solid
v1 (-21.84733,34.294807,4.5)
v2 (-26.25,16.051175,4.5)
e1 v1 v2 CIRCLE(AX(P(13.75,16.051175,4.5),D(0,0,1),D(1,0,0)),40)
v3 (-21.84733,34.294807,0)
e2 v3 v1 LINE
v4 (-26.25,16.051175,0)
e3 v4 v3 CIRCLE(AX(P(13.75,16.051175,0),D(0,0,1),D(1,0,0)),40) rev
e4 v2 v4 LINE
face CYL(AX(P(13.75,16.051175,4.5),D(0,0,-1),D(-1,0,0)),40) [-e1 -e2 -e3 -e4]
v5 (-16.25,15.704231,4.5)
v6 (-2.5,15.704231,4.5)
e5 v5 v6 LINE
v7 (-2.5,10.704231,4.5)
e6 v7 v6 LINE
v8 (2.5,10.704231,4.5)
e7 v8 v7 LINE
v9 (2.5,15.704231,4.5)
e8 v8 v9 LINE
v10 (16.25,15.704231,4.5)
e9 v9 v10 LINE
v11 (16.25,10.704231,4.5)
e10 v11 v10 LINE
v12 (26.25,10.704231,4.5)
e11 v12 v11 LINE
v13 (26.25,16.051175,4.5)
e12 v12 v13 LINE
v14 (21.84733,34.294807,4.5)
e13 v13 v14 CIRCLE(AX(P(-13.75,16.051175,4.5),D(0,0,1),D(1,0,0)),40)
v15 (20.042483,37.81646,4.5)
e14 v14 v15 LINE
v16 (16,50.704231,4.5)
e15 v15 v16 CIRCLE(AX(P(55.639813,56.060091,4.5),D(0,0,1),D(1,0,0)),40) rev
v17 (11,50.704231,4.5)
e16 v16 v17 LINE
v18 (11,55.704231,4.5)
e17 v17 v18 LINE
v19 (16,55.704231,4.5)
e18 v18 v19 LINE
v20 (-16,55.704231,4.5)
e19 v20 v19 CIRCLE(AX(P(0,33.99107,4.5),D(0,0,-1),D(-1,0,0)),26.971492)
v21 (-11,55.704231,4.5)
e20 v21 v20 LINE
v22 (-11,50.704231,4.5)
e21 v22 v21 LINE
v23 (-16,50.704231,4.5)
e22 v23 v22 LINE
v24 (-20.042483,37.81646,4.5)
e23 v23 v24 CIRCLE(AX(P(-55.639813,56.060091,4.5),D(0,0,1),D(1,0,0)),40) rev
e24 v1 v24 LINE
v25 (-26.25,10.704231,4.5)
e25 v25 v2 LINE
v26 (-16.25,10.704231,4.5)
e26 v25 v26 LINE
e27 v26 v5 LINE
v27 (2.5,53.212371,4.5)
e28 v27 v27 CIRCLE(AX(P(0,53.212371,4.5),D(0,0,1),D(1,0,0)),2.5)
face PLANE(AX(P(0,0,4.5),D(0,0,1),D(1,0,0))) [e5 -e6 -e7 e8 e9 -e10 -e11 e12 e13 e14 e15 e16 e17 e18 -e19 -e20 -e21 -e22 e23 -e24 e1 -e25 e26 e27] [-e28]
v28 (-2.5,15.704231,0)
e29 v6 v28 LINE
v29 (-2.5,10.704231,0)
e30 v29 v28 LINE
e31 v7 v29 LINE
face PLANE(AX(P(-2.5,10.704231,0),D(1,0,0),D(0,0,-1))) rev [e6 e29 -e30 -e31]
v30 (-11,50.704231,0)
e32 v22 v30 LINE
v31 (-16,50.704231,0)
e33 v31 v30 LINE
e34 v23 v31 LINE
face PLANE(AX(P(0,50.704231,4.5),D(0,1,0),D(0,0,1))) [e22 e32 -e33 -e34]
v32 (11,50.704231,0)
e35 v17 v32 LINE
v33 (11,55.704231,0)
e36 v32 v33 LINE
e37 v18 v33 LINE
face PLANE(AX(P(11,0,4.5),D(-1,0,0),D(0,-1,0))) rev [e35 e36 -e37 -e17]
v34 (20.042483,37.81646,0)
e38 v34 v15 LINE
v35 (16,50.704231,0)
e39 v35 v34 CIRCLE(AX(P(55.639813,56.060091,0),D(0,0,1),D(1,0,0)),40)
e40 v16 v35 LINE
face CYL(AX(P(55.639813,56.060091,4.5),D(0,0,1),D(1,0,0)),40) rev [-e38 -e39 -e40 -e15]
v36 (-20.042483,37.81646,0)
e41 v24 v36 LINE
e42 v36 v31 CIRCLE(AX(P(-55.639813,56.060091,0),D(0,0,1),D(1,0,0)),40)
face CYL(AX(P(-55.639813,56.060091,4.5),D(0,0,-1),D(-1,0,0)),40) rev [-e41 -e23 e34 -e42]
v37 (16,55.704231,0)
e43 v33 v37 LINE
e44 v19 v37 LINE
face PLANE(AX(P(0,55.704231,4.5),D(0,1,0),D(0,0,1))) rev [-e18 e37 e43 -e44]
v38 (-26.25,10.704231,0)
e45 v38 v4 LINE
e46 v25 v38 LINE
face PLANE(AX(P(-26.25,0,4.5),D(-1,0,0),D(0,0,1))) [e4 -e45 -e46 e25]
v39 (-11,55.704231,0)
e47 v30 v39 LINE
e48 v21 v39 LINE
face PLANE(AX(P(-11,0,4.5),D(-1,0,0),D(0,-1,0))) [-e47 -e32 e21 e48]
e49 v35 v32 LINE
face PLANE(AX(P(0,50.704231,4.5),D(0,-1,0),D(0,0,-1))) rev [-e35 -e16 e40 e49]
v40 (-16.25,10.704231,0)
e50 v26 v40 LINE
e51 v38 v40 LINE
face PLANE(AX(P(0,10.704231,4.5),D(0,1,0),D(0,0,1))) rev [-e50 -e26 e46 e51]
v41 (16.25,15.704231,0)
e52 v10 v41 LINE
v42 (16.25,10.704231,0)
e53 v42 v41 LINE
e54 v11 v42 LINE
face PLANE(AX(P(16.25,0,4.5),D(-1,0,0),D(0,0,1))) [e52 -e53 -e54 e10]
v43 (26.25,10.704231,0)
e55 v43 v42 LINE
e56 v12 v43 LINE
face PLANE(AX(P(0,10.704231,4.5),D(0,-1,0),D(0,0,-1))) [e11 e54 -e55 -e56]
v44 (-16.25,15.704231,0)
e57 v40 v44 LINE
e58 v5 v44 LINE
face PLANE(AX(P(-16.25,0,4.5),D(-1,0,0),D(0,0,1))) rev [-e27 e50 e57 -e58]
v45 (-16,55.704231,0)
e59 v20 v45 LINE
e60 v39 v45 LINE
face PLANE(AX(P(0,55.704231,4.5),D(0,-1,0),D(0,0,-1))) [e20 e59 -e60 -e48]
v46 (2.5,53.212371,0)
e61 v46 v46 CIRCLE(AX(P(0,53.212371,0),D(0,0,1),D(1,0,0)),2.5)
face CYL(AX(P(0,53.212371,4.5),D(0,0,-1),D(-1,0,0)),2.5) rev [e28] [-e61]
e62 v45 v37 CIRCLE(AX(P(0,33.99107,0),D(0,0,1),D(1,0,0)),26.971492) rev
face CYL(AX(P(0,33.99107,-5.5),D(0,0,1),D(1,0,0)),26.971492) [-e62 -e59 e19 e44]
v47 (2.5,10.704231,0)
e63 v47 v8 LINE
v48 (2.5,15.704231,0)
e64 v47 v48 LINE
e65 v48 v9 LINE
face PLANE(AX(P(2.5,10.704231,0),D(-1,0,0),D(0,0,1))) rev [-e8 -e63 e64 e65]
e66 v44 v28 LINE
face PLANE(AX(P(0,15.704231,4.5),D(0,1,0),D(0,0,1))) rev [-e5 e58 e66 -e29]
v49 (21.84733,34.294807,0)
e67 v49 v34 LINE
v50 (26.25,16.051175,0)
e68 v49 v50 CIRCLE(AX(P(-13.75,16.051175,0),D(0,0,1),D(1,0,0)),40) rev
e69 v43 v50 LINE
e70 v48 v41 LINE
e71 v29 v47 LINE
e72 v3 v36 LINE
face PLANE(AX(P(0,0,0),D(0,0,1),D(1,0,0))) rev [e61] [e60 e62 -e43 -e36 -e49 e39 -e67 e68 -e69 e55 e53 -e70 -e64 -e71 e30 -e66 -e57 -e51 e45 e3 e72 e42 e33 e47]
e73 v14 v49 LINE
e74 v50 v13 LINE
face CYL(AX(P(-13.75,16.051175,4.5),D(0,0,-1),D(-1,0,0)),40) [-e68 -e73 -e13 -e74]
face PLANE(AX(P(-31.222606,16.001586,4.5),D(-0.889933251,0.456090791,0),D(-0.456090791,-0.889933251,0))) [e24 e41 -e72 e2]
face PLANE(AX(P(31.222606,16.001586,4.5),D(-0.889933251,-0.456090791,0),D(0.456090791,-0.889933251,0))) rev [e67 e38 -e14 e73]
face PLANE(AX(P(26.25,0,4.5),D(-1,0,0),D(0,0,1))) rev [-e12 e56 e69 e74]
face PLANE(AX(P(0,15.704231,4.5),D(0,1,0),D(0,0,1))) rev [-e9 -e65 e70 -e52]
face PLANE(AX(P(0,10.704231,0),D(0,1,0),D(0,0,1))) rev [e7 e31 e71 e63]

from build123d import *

# Parameters (mm, degrees)
SKETCH1_R           = 2.5
BOSS_EXTRUDE1_DEPTH = 4.5
FILLET1_R           = 40
SKETCH2_W           = 5
SKETCH2_H           = 4.5
BOSS_EXTRUDE2_DEPTH = 5
CHAMFER1_SIZE       = 6
FILLET2_R           = 30
CUT_EXTRUDE1_DEPTH  = 10


# Some blends are built 0.0001 mm under size
with BuildPart() as part:
    # Sketch1 → Boss-Extrude1 (new body)
    with BuildSketch(Plane.XY):
        Polygon((-16.25, 10.704231142), (-16.25, 15.704231142), (16.25, 15.704231142), (16.25, 10.704231142), (26.25, 10.704231142), (26.25, 25.704231142), (16, 45.704231142), (16, 50.704231142), (11, 50.704231142), (11, 55.704231142), (16, 55.704231142), (16, 61.704231142), (-16, 61.704231142), (-16, 55.704231142), (-11, 55.704231142), (-11, 50.704231142), (-16, 50.704231142), (-16, 45.704231142), (-26.25, 25.704231142), (-26.25, 10.704231142), align=None)
        with Locations((0, 53.212370659)):
            Circle(SKETCH1_R, mode=Mode.SUBTRACT)
    extrude(amount=BOSS_EXTRUDE1_DEPTH)

    # Fillet1
    # the kernel refuses this fillet: 40 mm, written as the material it adds along each edge
    with BuildSketch(Plane(origin=(-16, 45.704231142, 0), x_dir=(0, 1, 0), z_dir=(0, 0, 1))) as fillet1_piece_1:
        with BuildLine():
            CenterArc((10.355860331, 39.639812816), FILLET1_R, 242.864860378, 19.440324463)
            Line((-7.887771306, 4.042482794), (0, 0))
            Line((0, 0), (5, 0))
        make_face()
    extrude(amount=4.5)
    with BuildSketch(Plane(origin=(16, 45.704231142, 0), x_dir=(0.4560907909103989, -0.8899332505568757, 0), z_dir=(0, 0, 1))) as fillet1_piece_2:
        with BuildLine():
            CenterArc((8.863329132, 40), FILLET1_R, 250.559675537, 19.440324463)
            Line((-4.449666253, 2.280453955), (0, 0))
            Line((0, 0), (8.863329132, 0))
        make_face()
    extrude(amount=4.5)
    # the kernel refuses this fillet: 40 mm, written as the material it takes off along each edge
    with BuildSketch(Plane(origin=(-26.25, 25.704231142, -24.132640175), x_dir=(0, -1, 0), z_dir=(0, 0, 1))) as fillet1_2_piece_1:
        with BuildLine():
            CenterArc((FILLET1_R * 0.241326401753, FILLET1_R), FILLET1_R, 242.864860378, 27.135139622)
            Line((-FILLET1_R * 0.214764389157, FILLET1_R * 0.110066749443), (0, 0))
            Line((0, 0), (FILLET1_R * 0.241326401753, 0))
        make_face()
    extrude(amount=52.765280351, mode=Mode.SUBTRACT)
    with BuildSketch(Plane(origin=(26.25, 25.704231142, -24.132640175), x_dir=(0, -1, 0), z_dir=(0, 0, 1))) as fillet1_2_piece_2:
        with BuildLine():
            CenterArc((FILLET1_R * 0.241326401753, -FILLET1_R), FILLET1_R, 90, 27.135139622)
            Line((-FILLET1_R * 0.214764389157, -FILLET1_R * 0.110066749443), (0, 0))
            Line((0, 0), (FILLET1_R * 0.241326401753, 0))
        make_face()
    extrude(amount=52.765280351, mode=Mode.SUBTRACT)

    # Sketch2 → Boss-Extrude2 (add)
    with BuildSketch(Plane.XZ.offset(-15.704231142)):
        with Locations((0, 2.25)):
            Rectangle(SKETCH2_W, SKETCH2_H)
    extrude(amount=BOSS_EXTRUDE2_DEPTH)

    # Chamfer1
    chamfer1_edges = [part.edges().sort_by_distance(p)[0] for p in [
        (16, 61.704231142, 2.25),
        (-16, 61.704231142, 2.25),
    ]]
    chamfer(chamfer1_edges, length=CHAMFER1_SIZE - 0.0001)  # a hair under: the kernel refuses the full size

    # Fillet2
    # the kernel refuses this fillet: 30 mm, written as the material it takes off along each edge
    with BuildSketch(Plane(origin=(10.0001, 61.704231142, -29.999916665), x_dir=(-1, 0, 0), z_dir=(0, 0, 1))) as fillet2_piece_1:
        with BuildLine():
            CenterArc((11.999966666, 30), FILLET2_R, 233.130420665, 36.869579335)
            Line((-5.9999, 5.9999), (-6.359897333, 5.519898))
            ThreePointArc((-6.359897333, 5.519898), (-3.424214069, 2.575685931), (-0.424264069, -0.424264069))
            Line((-0.424264069, -0.424264069), (0, -0.6))
            Line((0, -0.6), (11.999966666, -0.6))
            Line((11.999966666, -0.6), (11.999966666, 0))
        make_face()
    extrude(amount=64.499833329, mode=Mode.SUBTRACT)
    with BuildSketch(Plane(origin=(-10.0001, 61.704231142, -29.999916665), x_dir=(-0.7071067811865477, -0.7071067811865472, 0), z_dir=(0, 0, 1))) as fillet2_piece_2:
        with BuildLine():
            CenterArc((12.727945632, 29.698461239), FILLET2_R, 225, 36.869579335)
            Line((-8.485257803, 8.485257803), (-8.909521872, 8.060993735))
            Line((-8.909521872, 8.060993735), (-0.424264069, -0.424264069))
            Line((-0.424264069, -0.424264069), (0, -0.6))
            ThreePointArc((0, -0.6), (4.242569976, -0.6), (8.400283839, -0.593969225))
            Line((8.400283839, -0.593969225), (8.485139953, 0))
        make_face()
    extrude(amount=64.499833329, mode=Mode.SUBTRACT)

    # Sketch3 → Cut-Extrude1 (cut)
    with BuildSketch(Plane.XY.offset(4.5)):
        with BuildLine():
            ThreePointArc((-16, 55.704231142), (0, 60.96256169), (16, 55.704231142))
            ThreePointArc((16, 55.704231142), (0, 69.243827032), (-16, 55.704231142))
        make_face()
    extrude(amount=-CUT_EXTRUDE1_DEPTH, mode=Mode.SUBTRACT)


solid = part.part
